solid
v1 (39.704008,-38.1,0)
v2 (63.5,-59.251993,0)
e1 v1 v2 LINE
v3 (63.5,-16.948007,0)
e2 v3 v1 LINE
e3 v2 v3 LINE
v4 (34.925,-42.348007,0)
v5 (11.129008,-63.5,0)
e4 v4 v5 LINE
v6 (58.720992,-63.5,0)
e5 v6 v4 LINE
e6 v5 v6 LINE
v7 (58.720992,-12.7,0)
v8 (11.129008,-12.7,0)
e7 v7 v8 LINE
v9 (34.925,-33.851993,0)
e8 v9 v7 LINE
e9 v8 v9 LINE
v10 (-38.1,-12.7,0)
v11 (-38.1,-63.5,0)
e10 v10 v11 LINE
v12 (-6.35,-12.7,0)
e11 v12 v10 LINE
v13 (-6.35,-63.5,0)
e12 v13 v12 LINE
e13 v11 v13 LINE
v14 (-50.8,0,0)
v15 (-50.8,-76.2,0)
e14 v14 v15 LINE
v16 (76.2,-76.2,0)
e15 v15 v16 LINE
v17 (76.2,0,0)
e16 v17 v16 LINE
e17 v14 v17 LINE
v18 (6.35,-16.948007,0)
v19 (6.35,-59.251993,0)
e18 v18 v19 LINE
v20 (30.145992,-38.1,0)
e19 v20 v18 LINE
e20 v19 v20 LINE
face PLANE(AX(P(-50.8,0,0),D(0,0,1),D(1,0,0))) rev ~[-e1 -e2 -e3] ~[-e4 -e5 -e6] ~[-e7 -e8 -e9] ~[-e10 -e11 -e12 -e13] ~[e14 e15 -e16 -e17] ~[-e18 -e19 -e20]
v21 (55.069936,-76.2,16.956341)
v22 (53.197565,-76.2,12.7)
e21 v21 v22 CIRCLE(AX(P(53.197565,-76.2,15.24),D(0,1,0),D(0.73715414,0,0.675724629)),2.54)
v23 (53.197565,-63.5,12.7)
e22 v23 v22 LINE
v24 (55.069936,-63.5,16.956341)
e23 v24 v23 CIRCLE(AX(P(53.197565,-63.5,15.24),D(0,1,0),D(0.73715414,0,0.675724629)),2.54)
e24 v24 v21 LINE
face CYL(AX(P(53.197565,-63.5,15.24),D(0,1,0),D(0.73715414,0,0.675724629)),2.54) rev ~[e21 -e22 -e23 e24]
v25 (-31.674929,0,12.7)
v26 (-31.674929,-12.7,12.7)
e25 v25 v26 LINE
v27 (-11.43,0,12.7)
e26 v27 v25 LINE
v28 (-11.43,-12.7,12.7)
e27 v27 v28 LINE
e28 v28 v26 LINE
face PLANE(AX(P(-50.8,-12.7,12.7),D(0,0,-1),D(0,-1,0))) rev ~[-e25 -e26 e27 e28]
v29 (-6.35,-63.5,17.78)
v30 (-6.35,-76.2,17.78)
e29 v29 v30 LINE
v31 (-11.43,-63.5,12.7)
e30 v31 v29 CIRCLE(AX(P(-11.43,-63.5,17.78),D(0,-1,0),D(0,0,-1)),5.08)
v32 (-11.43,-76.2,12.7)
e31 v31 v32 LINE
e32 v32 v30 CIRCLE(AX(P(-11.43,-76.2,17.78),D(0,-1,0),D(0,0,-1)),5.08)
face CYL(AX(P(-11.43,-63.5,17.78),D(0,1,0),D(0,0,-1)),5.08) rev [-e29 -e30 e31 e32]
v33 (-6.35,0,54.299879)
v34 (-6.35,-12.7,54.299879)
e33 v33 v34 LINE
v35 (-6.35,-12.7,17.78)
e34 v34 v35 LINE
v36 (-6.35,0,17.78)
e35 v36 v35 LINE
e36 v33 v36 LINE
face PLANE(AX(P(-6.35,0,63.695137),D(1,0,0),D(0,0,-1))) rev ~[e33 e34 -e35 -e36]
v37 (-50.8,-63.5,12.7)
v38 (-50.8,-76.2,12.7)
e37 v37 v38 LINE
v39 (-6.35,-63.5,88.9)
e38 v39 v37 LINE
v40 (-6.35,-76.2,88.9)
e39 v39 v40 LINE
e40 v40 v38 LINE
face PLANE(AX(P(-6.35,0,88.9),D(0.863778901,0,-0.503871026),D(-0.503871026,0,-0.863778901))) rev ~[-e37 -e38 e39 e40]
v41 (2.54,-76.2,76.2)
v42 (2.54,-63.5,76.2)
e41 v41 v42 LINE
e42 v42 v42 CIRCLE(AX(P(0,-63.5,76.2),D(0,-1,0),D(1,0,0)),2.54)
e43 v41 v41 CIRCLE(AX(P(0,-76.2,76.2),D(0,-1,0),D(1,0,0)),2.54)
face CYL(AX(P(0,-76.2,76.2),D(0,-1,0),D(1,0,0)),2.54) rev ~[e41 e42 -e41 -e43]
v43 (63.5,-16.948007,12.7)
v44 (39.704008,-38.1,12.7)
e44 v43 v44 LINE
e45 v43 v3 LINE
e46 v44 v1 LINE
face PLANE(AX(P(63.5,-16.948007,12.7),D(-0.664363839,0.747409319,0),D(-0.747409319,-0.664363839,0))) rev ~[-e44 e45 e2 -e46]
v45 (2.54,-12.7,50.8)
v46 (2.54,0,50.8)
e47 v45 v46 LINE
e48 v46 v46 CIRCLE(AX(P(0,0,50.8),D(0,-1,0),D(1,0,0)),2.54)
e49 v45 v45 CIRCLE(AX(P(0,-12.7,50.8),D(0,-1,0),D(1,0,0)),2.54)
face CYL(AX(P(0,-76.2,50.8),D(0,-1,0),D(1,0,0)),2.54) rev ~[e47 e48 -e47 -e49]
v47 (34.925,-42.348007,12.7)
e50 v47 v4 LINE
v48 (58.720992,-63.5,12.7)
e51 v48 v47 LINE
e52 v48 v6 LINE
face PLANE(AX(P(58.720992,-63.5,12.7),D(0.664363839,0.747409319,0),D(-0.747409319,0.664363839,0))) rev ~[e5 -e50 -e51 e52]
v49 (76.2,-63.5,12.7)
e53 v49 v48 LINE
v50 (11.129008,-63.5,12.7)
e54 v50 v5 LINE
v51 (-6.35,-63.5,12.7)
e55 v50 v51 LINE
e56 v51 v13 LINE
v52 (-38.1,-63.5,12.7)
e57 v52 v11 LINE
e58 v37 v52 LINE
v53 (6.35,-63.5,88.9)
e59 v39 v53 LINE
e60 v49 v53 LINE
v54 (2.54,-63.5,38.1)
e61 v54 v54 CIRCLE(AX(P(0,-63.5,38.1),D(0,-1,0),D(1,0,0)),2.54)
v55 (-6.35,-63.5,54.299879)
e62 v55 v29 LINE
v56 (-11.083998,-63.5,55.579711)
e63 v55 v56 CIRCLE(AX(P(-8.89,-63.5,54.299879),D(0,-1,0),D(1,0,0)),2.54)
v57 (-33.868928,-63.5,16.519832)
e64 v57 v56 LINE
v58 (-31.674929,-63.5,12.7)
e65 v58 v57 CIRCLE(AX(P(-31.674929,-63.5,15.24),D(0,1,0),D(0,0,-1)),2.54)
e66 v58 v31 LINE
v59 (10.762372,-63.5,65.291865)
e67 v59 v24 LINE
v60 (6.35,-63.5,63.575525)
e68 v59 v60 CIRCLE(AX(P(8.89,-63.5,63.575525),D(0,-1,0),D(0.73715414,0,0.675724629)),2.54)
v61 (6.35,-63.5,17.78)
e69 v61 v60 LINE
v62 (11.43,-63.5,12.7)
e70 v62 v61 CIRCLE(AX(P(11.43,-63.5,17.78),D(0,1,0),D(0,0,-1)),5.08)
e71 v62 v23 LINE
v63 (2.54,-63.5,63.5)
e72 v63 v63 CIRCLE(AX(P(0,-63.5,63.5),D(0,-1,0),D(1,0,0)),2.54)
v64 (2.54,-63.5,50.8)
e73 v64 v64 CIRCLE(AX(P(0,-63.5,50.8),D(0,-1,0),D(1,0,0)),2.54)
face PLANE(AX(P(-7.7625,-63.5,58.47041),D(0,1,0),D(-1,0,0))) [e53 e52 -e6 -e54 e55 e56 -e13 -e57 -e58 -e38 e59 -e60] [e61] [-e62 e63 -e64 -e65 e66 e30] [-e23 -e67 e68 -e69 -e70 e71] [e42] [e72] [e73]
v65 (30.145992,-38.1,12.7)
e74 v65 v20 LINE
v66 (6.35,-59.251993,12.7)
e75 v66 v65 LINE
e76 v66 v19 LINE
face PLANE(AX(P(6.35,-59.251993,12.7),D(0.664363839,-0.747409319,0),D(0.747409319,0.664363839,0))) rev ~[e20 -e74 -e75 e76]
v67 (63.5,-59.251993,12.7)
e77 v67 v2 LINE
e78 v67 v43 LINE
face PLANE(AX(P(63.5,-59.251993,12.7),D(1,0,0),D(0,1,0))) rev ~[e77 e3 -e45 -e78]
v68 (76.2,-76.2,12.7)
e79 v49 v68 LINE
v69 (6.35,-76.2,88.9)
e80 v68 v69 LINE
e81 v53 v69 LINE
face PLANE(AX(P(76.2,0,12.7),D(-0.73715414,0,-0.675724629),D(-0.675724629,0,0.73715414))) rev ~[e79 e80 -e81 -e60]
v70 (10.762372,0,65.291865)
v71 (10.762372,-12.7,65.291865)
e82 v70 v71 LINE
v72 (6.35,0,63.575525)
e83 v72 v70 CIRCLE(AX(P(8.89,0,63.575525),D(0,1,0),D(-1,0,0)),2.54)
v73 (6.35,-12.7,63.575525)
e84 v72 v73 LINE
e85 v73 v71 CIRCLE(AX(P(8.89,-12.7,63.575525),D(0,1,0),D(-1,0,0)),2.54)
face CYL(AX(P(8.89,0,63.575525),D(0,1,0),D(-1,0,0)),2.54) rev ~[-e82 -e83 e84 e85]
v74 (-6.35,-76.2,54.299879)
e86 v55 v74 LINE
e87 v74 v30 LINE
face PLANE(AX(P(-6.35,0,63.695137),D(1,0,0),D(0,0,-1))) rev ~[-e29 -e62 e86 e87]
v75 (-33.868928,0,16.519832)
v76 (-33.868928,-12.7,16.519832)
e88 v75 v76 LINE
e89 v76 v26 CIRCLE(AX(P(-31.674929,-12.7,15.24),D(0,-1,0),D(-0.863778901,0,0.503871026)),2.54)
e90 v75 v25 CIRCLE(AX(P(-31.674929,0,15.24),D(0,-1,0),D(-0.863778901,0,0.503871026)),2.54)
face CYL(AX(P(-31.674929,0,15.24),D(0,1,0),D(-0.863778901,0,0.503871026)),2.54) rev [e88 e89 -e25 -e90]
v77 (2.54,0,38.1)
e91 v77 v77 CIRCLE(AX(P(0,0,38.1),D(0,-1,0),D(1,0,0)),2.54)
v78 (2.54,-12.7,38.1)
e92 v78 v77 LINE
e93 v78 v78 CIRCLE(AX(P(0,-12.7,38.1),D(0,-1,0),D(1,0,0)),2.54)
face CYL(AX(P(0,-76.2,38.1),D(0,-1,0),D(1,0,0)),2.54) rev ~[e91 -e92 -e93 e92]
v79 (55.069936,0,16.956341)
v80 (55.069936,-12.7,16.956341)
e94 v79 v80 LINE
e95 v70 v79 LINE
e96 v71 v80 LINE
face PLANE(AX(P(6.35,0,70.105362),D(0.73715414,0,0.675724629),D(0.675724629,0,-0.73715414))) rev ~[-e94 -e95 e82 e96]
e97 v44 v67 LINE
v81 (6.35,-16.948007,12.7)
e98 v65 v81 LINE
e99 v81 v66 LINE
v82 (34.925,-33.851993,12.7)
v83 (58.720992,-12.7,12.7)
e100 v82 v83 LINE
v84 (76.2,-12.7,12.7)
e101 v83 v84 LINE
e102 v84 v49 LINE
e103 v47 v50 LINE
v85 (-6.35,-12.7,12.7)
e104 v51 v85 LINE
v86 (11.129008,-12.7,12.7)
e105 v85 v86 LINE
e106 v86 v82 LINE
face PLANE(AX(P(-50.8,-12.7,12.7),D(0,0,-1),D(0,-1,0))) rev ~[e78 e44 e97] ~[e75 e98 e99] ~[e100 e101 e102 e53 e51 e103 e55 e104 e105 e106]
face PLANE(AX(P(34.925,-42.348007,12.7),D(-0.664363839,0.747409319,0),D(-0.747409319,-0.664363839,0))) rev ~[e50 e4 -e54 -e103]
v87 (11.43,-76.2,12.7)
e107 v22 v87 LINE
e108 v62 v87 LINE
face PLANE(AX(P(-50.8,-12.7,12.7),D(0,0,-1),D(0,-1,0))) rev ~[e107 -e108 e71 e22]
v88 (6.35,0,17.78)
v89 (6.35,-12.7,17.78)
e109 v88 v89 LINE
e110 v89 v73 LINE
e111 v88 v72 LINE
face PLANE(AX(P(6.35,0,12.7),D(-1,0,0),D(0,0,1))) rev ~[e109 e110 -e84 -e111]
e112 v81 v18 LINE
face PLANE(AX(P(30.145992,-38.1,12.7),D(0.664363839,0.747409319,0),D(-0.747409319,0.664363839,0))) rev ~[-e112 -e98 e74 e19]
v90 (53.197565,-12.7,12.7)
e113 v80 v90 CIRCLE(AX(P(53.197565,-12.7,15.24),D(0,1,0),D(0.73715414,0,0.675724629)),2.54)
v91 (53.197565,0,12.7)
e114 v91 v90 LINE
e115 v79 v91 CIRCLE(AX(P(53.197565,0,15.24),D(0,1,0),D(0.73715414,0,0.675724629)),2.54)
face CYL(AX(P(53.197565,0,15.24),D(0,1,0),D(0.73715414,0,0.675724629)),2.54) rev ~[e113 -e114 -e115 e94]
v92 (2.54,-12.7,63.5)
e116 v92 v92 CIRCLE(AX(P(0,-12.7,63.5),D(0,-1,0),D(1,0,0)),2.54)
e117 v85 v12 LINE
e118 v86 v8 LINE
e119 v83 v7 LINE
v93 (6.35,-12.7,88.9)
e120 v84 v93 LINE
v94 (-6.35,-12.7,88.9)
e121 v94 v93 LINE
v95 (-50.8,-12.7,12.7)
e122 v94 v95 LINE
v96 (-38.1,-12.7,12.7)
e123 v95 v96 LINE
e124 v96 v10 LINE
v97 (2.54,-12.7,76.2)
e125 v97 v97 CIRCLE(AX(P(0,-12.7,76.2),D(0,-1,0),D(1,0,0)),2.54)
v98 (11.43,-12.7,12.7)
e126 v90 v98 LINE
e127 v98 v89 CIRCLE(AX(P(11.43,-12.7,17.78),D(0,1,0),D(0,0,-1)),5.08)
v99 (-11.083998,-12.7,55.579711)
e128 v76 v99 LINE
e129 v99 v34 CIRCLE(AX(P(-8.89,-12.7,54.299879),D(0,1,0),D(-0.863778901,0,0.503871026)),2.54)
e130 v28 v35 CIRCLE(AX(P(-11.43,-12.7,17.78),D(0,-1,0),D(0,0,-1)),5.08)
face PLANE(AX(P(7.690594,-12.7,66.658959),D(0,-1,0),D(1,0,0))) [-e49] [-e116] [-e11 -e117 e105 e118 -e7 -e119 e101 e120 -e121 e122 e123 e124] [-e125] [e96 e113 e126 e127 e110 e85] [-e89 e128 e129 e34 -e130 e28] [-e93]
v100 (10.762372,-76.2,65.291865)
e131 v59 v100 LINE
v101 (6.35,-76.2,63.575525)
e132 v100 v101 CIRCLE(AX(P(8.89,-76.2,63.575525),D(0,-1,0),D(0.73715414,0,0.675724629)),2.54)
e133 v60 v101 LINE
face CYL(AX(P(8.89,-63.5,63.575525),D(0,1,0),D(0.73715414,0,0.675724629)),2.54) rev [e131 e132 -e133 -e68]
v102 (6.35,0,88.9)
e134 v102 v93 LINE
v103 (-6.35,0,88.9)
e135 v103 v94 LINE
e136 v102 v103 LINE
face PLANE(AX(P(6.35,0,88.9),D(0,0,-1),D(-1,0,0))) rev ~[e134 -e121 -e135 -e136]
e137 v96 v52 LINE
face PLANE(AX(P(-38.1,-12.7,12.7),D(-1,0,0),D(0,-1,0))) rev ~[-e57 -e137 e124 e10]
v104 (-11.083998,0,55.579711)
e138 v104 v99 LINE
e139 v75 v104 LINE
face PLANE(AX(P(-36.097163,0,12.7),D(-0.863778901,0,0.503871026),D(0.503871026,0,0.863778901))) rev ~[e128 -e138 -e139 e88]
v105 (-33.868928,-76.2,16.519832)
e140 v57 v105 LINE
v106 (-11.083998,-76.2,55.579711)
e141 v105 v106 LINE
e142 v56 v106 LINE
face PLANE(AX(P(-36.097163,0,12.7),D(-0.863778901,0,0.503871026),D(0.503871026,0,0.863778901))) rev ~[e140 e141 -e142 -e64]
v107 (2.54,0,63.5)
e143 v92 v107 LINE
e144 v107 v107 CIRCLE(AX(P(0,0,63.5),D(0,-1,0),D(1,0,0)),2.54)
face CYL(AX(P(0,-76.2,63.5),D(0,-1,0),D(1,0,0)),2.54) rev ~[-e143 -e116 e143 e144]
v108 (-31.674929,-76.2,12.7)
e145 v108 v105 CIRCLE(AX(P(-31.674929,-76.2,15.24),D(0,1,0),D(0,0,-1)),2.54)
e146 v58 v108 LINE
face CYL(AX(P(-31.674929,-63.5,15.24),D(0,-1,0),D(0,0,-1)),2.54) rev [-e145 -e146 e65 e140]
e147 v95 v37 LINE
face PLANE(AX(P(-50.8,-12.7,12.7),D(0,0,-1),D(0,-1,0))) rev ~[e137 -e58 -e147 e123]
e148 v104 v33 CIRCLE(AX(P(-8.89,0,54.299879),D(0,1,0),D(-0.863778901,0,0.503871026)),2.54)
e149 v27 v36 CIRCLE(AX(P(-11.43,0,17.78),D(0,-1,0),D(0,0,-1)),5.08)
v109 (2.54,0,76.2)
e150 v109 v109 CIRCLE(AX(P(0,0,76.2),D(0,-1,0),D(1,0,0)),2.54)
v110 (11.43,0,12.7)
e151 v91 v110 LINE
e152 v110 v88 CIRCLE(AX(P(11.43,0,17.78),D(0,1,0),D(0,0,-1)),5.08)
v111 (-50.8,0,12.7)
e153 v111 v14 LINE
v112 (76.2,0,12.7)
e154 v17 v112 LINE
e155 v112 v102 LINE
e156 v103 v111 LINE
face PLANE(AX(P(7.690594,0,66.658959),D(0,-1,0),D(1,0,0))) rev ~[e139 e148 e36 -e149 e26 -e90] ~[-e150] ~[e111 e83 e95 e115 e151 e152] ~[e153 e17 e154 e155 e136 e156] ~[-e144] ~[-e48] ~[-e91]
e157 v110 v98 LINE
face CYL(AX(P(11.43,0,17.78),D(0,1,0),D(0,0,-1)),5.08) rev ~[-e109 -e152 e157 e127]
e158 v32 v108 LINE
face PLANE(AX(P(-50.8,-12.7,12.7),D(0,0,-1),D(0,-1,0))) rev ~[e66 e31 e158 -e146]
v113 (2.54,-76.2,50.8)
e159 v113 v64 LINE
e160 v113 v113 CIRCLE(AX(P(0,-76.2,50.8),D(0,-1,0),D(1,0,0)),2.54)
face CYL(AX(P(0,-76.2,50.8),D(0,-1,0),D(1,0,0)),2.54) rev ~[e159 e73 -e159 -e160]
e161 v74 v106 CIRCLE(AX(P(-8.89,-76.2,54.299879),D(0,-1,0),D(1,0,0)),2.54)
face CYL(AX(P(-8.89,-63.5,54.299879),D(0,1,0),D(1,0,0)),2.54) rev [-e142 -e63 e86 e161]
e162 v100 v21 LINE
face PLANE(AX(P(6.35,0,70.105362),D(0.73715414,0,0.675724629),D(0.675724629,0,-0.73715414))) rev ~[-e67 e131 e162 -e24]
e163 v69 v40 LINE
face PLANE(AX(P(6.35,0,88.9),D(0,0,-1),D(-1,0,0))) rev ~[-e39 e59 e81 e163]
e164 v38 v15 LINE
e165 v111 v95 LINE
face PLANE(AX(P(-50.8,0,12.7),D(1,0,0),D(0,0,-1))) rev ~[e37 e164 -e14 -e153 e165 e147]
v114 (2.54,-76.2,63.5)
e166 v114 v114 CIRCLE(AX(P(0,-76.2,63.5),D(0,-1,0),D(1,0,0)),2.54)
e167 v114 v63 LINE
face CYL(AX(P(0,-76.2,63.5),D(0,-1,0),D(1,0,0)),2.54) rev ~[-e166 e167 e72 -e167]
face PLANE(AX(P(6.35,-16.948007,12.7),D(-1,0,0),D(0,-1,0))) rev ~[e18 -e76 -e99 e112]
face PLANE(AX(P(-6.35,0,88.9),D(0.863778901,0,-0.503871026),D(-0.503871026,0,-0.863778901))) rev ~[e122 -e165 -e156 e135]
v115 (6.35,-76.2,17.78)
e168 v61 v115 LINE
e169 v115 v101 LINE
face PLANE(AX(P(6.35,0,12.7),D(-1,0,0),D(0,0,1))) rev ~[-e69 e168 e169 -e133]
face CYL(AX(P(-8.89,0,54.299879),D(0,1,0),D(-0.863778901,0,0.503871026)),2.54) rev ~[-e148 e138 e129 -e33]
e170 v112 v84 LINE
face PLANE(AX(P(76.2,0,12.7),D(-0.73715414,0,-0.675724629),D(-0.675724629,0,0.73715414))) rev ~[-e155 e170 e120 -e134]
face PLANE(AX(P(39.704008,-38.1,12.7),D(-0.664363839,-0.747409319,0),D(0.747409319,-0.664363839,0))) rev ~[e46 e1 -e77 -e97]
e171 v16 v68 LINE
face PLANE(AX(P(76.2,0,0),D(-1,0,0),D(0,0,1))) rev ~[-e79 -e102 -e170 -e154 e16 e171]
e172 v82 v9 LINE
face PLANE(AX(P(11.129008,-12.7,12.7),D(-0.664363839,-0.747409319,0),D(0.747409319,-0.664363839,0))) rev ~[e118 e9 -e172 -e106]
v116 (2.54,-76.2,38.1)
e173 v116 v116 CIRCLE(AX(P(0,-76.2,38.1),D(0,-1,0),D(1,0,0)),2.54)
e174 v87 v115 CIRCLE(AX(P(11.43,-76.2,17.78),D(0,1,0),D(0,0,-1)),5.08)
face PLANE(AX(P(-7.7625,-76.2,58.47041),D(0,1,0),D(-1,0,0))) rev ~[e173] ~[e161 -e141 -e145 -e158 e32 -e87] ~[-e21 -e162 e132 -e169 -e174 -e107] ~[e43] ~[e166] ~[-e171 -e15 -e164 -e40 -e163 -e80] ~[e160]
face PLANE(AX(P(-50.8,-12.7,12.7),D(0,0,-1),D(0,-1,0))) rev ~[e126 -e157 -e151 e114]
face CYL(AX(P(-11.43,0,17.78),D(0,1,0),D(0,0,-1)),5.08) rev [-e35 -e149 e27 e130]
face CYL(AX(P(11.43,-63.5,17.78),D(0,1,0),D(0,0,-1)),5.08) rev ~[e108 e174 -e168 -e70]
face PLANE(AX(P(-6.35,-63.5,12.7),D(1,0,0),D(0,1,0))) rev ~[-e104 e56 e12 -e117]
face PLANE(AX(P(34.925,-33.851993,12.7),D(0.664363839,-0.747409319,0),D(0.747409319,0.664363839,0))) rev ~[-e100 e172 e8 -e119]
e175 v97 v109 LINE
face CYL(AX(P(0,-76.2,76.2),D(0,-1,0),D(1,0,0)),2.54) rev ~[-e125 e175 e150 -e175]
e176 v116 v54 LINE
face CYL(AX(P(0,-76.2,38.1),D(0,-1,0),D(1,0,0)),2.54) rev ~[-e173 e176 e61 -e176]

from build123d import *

# Parameters (mm, degrees)
F0_R        = 2.2479
F1_DEPTH    = 76.2
F2_W        = 50.8
F2_H        = 76.2
F3_DEPTH    = 254
F5_DEPTH    = 25.4
F6_T1_DEPTH = 12.7
F6_T3_DEPTH = 12.7
F7_T1_DEPTH = 12.7
F7_T3_DEPTH = 12.7
F8_R        = 2.54
F9_R        = 2.54
F10_DEPTH   = 254


# Not quite as in the source:
# - a fillet or chamfer that OpenCascade refuses, or shapes differently, is made with other operations: its cross-section is extruded or revolved along the edge and cut away or added


with BuildPart() as f1:
    # F0 (on Front) → F1 (new body)
    with BuildSketch(Plane.XZ):
        Polygon((-50.8, 0), (0, 0), (76.2, 0), (76.2, 12.7), (6.35, 88.9), (-6.35, 88.9), (-50.8, 12.7), align=None)
        Polygon((-6.35, 12.7), (-36.0971634445, 12.7), (-6.35, 63.6951373334), align=None, mode=Mode.SUBTRACT)
        with Locations((0, 38.1)):
            Circle(F0_R, mode=Mode.SUBTRACT)
        Polygon((6.35, 12.7), (6.35, 70.1053616754), (58.9715815358, 12.7), align=None, mode=Mode.SUBTRACT)
        with Locations((0, 50.8)):
            Circle(F0_R, mode=Mode.SUBTRACT)
        with Locations((0, 63.5)):
            Circle(F0_R, mode=Mode.SUBTRACT)
        with Locations((0, 76.2)):
            Circle(F0_R, mode=Mode.SUBTRACT)
    extrude(amount=F1_DEPTH)

    # F2 (on face) → F3 (cut)
    with BuildSketch(Plane(origin=(-50.8, 0, 0), x_dir=(0, -1, 0), z_dir=(-1, 0, 0))):
        with Locations((38.1, 50.8)):
            Rectangle(F2_W, F2_H)
    extrude(amount=-F3_DEPTH, mode=Mode.SUBTRACT)

    # F4 (on face) → F5 (cut)
    with BuildSketch(Plane.XY.offset(12.7)):
        Polygon((58.7209921515, -12.7), (11.1290078485, -12.7), (34.925, -33.8519930236), align=None)
        Polygon((34.925, -42.3480069764), (11.1290078485, -63.5), (58.7209921515, -63.5), align=None)
        Polygon((-36.0971634445, -12.7), (-38.1, -12.7), (-38.1, -63.5), (-36.0971634445, -63.5), (-6.35, -63.5), (-6.35, -12.7), align=None)
        Polygon((30.1459921515, -38.1), (6.35, -16.9480069764), (6.35, -59.2519930236), align=None)
        Polygon((63.5, -59.2519930236), (63.5, -16.9480069764), (39.7040078485, -38.1), align=None)
    extrude(amount=-F5_DEPTH, mode=Mode.SUBTRACT)

    # F6: fillet of radius 5.08 on 4 edges, made by hand

    # F6_s2 → F6_t1 (join)
    with BuildSketch(Plane.XZ.offset(63.5)):
        with BuildLine():
            ThreePointArc((-11.43, 12.7), (-7.8378975516, 14.1878975516), (-6.35, 17.78))
            Line((-6.35, 17.78), (-6.35, 12.7))
            Line((-6.35, 12.7), (-11.43, 12.7))
        make_face()
        with BuildLine():
            ThreePointArc((11.43, 12.7), (7.8378975516, 14.1878975516), (6.35, 17.78))
            Line((6.35, 17.78), (6.35, 12.7))
            Line((6.35, 12.7), (11.43, 12.7))
        make_face()
    extrude(amount=F6_T1_DEPTH)

    # F6_s4 → F6_t3 (join)
    with BuildSketch(Plane.XZ):
        with BuildLine():
            ThreePointArc((-11.43, 12.7), (-7.8378975516, 14.1878975516), (-6.35, 17.78))
            Line((-6.35, 17.78), (-6.35, 12.7))
            Line((-6.35, 12.7), (-11.43, 12.7))
        make_face()
        with BuildLine():
            ThreePointArc((11.43, 12.7), (7.8378975516, 14.1878975516), (6.35, 17.78))
            Line((6.35, 17.78), (6.35, 12.7))
            Line((6.35, 12.7), (11.43, 12.7))
        make_face()
    extrude(amount=F6_T3_DEPTH)

    # F7: fillet of radius 2.54 on 7 edges, made by hand

    # F7_s2 → F7_t1 (join)
    with BuildSketch(Plane.XZ.offset(63.5)):
        with BuildLine():
            ThreePointArc((-6.35, 54.2998790858), (-8.2271108528, 56.751853388), (-11.0839984083, 55.5797114907))
            Line((-11.0839984083, 55.5797114907), (-6.35, 63.6951373334))
            Line((-6.35, 63.6951373334), (-6.35, 54.2998790858))
        make_face()
        with BuildLine():
            ThreePointArc((55.0699360257, 16.9563405564), (55.5225489196, 14.2172353676), (53.1975645096, 12.7))
            Line((53.1975645096, 12.7), (58.9715815358, 12.7))
            Line((58.9715815358, 12.7), (55.0699360257, 16.9563405564))
        make_face()
        with BuildLine():
            ThreePointArc((10.7623715161, 65.291865476), (7.9691915647, 65.9427409692), (6.35, 63.5755249196))
            Line((6.35, 63.5755249196), (6.35, 70.1053616754))
            Line((6.35, 70.1053616754), (10.7623715161, 65.291865476))
        make_face()
    extrude(amount=F7_T1_DEPTH)

    # F7_s4 → F7_t3 (join)
    with BuildSketch(Plane.XZ):
        with BuildLine():
            ThreePointArc((6.35, 63.5755249196), (7.9691915647, 65.9427409692), (10.7623715161, 65.291865476))
            Line((10.7623715161, 65.291865476), (6.35, 70.1053616754))
            Line((6.35, 70.1053616754), (6.35, 63.5755249196))
        make_face()
        with BuildLine():
            ThreePointArc((-11.0839984083, 55.5797114907), (-8.2271108528, 56.751853388), (-6.35, 54.2998790858))
            Line((-6.35, 54.2998790858), (-6.35, 63.6951373334))
            Line((-6.35, 63.6951373334), (-11.0839984083, 55.5797114907))
        make_face()
        with BuildLine():
            ThreePointArc((55.0699360257, 16.9563405564), (55.5225489196, 14.2172353676), (53.1975645096, 12.7))
            Line((53.1975645096, 12.7), (58.9715815358, 12.7))
            Line((58.9715815358, 12.7), (55.0699360257, 16.9563405564))
        make_face()
        with BuildLine():
            ThreePointArc((-33.868927875, 16.5198324048), (-33.8774705343, 13.9749257548), (-31.6749294667, 12.7))
            Line((-31.6749294667, 12.7), (-36.0971634445, 12.7))
            Line((-36.0971634445, 12.7), (-33.868927875, 16.5198324048))
        make_face()
    extrude(amount=F7_T3_DEPTH)

    # F8
    f8_edges = [f1.edges().sort_by_distance(p)[0] for p in [
        (-36.097163, -69.85, 12.7),
    ]]
    fillet(f8_edges, radius=F8_R)

    # F9 (on face) → F10 (cut)
    with BuildSketch(Plane.XZ.offset(76.2)):
        with Locations((0, 76.2)):
            Circle(F9_R)
        with Locations((0, 63.5)):
            Circle(F9_R)
        with Locations((0, 50.8)):
            Circle(F9_R)
        with Locations((0, 38.1)):
            Circle(F9_R)
    extrude(amount=-F10_DEPTH, mode=Mode.SUBTRACT)


solid = f1.part
